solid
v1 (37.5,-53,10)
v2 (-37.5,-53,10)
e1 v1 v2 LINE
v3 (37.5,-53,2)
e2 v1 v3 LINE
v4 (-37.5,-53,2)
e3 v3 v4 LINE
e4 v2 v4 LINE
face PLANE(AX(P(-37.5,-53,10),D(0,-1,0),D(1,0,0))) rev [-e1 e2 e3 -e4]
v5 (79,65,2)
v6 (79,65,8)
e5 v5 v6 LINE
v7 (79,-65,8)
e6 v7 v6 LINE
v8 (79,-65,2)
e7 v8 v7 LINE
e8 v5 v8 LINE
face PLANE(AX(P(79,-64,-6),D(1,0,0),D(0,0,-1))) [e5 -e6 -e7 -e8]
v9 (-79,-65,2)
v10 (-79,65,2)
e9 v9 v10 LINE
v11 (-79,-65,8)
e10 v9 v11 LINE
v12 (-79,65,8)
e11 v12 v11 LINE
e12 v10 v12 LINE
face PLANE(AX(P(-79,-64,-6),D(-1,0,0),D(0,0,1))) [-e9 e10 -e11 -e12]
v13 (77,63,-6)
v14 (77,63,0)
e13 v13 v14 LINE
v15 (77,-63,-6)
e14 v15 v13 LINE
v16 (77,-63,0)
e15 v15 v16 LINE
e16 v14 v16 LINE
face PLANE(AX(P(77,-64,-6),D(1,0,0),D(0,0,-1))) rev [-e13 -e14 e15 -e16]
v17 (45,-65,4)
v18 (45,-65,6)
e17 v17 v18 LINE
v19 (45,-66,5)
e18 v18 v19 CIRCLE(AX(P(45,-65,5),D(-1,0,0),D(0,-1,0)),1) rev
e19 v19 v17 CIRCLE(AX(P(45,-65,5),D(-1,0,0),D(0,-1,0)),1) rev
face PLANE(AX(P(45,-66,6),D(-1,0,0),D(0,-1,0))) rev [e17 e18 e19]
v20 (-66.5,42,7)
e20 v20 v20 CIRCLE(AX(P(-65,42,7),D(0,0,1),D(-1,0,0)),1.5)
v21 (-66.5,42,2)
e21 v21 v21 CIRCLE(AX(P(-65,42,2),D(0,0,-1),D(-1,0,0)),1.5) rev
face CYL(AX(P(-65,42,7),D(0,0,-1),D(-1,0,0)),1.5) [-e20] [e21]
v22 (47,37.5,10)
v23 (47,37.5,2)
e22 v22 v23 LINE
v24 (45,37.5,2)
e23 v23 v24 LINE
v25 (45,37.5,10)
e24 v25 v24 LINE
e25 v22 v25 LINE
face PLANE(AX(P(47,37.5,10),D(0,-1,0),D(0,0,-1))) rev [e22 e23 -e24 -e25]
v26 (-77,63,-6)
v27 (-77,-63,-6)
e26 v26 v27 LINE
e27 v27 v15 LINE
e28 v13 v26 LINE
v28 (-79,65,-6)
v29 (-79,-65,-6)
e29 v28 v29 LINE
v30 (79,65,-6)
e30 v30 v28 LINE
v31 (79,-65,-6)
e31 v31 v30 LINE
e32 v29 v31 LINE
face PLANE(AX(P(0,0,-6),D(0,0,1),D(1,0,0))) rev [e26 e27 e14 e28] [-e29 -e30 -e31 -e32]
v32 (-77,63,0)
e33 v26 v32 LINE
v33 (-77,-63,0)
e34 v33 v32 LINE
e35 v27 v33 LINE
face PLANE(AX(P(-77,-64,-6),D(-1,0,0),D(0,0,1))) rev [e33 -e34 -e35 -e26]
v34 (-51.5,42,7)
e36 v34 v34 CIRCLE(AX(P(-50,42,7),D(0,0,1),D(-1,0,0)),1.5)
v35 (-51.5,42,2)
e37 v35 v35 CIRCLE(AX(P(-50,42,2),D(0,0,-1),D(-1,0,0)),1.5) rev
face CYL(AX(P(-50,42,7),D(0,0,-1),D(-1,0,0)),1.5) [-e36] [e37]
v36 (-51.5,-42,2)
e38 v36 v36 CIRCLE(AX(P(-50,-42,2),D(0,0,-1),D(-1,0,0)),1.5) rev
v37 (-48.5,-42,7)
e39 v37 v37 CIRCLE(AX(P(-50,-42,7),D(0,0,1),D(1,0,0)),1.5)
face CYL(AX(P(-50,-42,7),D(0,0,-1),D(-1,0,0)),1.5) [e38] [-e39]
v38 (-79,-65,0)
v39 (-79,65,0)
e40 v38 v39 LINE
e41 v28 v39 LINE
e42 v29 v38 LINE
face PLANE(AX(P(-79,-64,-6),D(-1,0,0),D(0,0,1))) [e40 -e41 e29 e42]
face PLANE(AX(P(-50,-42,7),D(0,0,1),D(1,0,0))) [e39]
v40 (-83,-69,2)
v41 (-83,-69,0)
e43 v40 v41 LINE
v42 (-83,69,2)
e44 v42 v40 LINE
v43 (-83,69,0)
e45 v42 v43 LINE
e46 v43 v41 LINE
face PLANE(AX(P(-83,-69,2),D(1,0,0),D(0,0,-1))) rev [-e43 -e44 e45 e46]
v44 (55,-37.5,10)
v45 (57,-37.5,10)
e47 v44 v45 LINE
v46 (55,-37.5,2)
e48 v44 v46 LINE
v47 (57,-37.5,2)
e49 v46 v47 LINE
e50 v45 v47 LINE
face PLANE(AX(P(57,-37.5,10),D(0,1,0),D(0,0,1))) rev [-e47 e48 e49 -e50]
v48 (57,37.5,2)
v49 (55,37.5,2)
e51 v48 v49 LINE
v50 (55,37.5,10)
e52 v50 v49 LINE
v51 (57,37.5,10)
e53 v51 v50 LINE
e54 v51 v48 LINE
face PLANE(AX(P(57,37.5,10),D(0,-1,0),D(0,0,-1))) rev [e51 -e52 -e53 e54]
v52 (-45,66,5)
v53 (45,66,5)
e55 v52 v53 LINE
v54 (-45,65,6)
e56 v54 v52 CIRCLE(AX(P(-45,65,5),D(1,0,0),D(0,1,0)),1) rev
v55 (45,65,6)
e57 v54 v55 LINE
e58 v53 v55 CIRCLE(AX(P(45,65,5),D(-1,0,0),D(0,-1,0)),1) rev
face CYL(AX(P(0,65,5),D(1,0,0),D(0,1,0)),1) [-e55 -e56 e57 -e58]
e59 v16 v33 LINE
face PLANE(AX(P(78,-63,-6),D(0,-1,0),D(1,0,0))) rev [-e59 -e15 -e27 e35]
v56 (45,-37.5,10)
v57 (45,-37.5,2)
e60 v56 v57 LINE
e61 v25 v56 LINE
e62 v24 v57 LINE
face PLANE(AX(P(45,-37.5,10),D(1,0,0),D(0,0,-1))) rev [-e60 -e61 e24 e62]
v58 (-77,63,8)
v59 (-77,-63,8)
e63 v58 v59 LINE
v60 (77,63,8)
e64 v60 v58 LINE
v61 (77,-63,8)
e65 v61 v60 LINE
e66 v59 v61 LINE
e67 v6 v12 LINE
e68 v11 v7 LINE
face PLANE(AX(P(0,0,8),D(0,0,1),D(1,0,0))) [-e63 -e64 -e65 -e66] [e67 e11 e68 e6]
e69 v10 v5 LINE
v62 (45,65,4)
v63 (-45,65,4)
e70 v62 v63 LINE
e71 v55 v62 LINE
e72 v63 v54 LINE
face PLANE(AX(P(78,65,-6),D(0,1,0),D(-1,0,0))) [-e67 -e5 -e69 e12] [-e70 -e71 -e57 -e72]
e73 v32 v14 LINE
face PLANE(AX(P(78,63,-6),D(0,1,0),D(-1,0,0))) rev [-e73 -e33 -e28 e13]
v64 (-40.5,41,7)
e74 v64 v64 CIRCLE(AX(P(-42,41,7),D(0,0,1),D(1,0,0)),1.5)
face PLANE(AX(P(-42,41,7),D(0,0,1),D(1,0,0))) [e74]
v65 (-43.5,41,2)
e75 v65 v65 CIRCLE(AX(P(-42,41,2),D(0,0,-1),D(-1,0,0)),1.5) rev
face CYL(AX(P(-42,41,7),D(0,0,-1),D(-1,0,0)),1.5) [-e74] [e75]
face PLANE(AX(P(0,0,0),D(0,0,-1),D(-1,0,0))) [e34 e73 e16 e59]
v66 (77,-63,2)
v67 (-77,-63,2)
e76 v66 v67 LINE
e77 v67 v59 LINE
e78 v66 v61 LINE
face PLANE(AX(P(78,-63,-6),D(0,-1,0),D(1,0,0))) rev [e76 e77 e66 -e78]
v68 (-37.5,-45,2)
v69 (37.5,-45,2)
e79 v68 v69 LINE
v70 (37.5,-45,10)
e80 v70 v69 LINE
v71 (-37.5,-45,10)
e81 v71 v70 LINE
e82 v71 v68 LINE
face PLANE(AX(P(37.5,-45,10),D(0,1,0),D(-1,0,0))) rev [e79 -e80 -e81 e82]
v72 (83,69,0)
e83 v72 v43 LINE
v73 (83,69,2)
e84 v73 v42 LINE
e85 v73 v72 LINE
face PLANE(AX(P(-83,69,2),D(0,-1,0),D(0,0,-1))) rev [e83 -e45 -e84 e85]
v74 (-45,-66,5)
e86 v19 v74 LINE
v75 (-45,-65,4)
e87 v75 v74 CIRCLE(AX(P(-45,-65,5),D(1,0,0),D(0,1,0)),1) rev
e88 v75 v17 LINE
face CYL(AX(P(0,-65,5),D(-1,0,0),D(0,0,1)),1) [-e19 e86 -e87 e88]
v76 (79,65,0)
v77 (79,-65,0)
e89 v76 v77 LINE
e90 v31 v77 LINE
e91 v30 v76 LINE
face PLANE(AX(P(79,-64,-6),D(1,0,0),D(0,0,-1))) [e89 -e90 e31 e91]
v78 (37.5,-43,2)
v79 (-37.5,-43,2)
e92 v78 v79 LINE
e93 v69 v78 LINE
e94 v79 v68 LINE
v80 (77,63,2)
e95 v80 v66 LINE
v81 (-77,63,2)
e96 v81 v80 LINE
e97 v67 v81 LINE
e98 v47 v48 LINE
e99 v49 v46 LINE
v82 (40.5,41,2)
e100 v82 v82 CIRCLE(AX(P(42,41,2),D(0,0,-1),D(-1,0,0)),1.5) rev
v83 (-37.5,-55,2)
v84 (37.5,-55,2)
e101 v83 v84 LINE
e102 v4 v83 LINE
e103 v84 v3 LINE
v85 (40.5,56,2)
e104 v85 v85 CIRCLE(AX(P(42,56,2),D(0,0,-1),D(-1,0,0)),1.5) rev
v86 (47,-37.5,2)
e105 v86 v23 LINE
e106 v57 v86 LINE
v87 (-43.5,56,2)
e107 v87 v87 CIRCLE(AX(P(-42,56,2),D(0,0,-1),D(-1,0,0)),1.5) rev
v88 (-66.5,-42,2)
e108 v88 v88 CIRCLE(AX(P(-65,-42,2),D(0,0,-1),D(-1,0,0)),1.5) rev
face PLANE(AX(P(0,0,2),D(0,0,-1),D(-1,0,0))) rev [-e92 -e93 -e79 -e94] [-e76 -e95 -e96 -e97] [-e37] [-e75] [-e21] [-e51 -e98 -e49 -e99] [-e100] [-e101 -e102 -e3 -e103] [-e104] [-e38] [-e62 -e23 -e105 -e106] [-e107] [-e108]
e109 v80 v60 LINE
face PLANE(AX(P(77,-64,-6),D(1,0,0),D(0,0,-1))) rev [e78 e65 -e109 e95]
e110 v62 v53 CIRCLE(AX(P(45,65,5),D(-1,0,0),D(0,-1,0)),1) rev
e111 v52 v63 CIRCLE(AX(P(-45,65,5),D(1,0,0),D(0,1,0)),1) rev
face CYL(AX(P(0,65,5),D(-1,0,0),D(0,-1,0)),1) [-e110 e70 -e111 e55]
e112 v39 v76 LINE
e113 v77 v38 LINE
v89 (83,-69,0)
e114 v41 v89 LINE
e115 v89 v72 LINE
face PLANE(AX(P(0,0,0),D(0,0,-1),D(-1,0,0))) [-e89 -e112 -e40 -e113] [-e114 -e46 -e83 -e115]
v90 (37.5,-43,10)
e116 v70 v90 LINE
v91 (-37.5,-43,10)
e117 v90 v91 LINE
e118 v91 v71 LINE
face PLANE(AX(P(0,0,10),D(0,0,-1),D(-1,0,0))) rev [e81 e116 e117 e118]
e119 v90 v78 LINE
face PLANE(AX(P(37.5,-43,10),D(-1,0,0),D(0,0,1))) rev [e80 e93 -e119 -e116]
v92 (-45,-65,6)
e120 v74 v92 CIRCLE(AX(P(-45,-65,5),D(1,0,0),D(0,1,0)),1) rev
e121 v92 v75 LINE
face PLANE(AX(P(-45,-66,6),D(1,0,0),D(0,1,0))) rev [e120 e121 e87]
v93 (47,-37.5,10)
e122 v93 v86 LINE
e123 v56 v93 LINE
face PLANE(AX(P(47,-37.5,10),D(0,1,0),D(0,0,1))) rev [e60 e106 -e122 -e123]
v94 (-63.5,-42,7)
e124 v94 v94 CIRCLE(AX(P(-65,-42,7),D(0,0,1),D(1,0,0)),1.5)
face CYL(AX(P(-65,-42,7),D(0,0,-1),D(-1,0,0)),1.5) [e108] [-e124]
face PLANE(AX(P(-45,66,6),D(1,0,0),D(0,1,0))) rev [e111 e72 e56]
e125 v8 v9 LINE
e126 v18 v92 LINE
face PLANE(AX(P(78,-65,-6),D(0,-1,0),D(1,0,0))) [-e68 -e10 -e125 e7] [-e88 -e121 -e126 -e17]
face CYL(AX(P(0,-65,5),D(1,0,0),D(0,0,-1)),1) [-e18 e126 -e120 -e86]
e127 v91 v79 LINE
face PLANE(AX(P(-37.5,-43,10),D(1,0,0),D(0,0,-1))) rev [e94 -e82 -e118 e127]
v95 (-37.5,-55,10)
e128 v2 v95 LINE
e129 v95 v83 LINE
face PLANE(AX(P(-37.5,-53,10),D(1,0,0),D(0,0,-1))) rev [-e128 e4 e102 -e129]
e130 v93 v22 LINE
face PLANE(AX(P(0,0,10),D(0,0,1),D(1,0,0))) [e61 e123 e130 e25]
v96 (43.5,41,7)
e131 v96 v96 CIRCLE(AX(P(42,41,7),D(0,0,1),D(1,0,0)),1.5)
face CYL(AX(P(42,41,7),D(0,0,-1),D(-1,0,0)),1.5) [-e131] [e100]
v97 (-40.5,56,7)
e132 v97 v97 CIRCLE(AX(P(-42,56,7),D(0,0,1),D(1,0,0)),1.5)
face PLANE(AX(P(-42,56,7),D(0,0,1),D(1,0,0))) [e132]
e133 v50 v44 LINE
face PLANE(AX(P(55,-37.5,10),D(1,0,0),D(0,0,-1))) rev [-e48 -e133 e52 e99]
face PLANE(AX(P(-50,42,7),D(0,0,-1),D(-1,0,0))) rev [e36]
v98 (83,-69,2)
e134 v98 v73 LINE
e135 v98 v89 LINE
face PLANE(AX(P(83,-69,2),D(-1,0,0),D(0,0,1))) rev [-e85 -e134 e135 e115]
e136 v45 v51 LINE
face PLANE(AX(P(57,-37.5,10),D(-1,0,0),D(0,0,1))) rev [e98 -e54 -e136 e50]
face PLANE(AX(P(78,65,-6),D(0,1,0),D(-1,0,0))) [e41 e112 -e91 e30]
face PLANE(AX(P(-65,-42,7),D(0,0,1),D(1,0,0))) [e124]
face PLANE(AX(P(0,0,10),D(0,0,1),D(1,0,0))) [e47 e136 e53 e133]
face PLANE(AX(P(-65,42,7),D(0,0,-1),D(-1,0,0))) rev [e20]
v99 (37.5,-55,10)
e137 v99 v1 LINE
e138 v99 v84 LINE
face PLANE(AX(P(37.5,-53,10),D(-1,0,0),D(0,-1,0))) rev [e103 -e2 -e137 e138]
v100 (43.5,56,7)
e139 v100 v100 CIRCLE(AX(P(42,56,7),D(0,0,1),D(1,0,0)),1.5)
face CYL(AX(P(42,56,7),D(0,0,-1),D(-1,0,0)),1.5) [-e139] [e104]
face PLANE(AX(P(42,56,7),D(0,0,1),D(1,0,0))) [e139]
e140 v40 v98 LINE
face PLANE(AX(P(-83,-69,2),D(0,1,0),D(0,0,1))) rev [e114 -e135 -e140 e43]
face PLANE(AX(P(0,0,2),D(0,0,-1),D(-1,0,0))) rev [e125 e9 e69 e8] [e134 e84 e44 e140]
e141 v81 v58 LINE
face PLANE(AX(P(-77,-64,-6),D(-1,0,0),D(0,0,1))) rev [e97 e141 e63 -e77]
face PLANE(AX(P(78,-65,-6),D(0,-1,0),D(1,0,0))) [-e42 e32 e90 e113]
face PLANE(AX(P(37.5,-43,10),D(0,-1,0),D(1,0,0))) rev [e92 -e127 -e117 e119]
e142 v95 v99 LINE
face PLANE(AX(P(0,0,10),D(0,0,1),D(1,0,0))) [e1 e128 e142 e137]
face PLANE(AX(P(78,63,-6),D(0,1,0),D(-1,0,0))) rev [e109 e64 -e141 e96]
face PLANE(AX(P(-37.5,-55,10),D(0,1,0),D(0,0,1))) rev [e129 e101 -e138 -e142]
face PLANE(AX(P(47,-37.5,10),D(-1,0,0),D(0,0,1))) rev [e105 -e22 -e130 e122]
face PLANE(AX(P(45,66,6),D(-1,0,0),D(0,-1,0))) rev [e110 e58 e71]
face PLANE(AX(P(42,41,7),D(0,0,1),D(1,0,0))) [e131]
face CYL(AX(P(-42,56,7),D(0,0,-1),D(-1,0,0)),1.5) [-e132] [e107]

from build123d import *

# Parameters (mm, degrees)
SKETCH_1_W           = 166
SKETCH_1_H           = 138
EXTRUDE_1_DEPTH      = 2
EXTRUDE_2_DEPTH      = 6
EXTRUDE_2_DEPTH_BACK = 8
SKETCH_2_W           = 158
SKETCH_2_H           = 130
SKETCH_2_W_2         = 154
SKETCH_2_H_2         = 126
SKETCH_3_R           = 1.5
EXTRUDE_2_2_DEPTH    = 5
SKETCH_5_R           = 1.5
EXTRUDE_3_DEPTH      = 5
SKETCH_4_R           = 1.5
EXTRUDE_4_DEPTH      = 5
SKETCH_6_W           = 75
SKETCH_6_H           = 2
SKETCH_6_W_2         = 2
SKETCH_6_H_2         = 75
EXTRUDE_5_DEPTH      = 8
SKETCH_9_W           = 90
SKETCH_9_H           = 2
EXTRUDE_6_DEPTH      = 1
FILLET_1_R           = 1
SKETCH_11_W          = 90
SKETCH_11_H          = 2
EXTRUDE_7_DEPTH      = 1
FILLET_2_R           = 1


with BuildPart() as part:
    # 스케치1 → 보스-돌출1 (new body)
    with BuildSketch(Plane.XY):
        Rectangle(SKETCH_1_W, SKETCH_1_H)
    extrude(amount=EXTRUDE_1_DEPTH)

    # 스케치2 → Extrude 2 (add, two sides: drawn at the far end of the back side and taken through both)
    with BuildSketch(Plane.XY.offset(2).offset(-EXTRUDE_2_DEPTH_BACK)):
        Rectangle(SKETCH_2_W, SKETCH_2_H)
        Rectangle(SKETCH_2_W_2, SKETCH_2_H_2, mode=Mode.SUBTRACT)
    extrude(amount=EXTRUDE_2_DEPTH + EXTRUDE_2_DEPTH_BACK)

    # 스케치3 → Extrude 2 2 (add)
    with BuildSketch(Plane.XY.offset(2)):
        with Locations(Location((-65, -42, 0), (0, 0, 180))):
            Circle(SKETCH_3_R)
        with Locations(Location((-50, -42, 0), (0, 0, 180))):
            Circle(SKETCH_3_R)
        with Locations(Location((-65, 42, 0), (0, 0, 180))):
            Circle(SKETCH_3_R)
        with Locations(Location((-50, 42, 0), (0, 0, 180))):
            Circle(SKETCH_3_R)
    extrude(amount=EXTRUDE_2_2_DEPTH)

    # 스케치5 → 보스-돌출3 (add)
    with BuildSketch(Plane.XY.offset(2)):
        with Locations(Location((42, 56, 0), (0, 0, 180))):
            Circle(SKETCH_5_R)
        with Locations(Location((42, 41, 0), (0, 0, 180))):
            Circle(SKETCH_5_R)
    extrude(amount=EXTRUDE_3_DEPTH)

    # 스케치4 → 보스-돌출4 (add)
    with BuildSketch(Plane.XY.offset(2)):
        with Locations(Location((-42, 56, 0), (0, 0, 180))):
            Circle(SKETCH_4_R)
        with Locations(Location((-42, 41, 0), (0, 0, 180))):
            Circle(SKETCH_4_R)
    extrude(amount=EXTRUDE_4_DEPTH)

    # 스케치6 → 보스-돌출5 (add)
    with BuildSketch(Plane.XY.offset(2)):
        with Locations((0, -54)):
            Rectangle(SKETCH_6_W, SKETCH_6_H)
        with Locations((0, -44)):
            Rectangle(SKETCH_6_W, SKETCH_6_H)
        with Locations((46, 0)):
            Rectangle(SKETCH_6_W_2, SKETCH_6_H_2)
        with Locations((56, 0)):
            Rectangle(SKETCH_6_W_2, SKETCH_6_H_2)
    extrude(amount=EXTRUDE_5_DEPTH)

    # 스케치9 → 보스-돌출6 (add)
    with BuildSketch(Plane.XZ.offset(65)):
        with Locations((0, 5)):
            Rectangle(SKETCH_9_W, SKETCH_9_H)
    extrude(amount=EXTRUDE_6_DEPTH)

    # 필렛1
    fillet_1_edges = [part.edges().sort_by_distance(p)[0] for p in [
        (0, -66, 4),
        (0, -66, 6),
    ]]
    fillet(fillet_1_edges, radius=FILLET_1_R - 0.0001)  # a hair under: the kernel refuses the full size

    # 스케치11 → 보스-돌출7 (add)
    with BuildSketch(Plane(origin=(0, 65, 0), x_dir=(1, 0, 0), z_dir=(0, 1, 0))):
        with Locations((0, -5)):
            Rectangle(SKETCH_11_W, SKETCH_11_H)
    extrude(amount=EXTRUDE_7_DEPTH)

    # 필렛2
    fillet_2_edges = [part.edges().sort_by_distance(p)[0] for p in [
        (0, 66, 4),
        (0, 66, 6),
    ]]
    fillet(fillet_2_edges, radius=FILLET_2_R - 0.0001)  # a hair under: the kernel refuses the full size


solid = part.part
